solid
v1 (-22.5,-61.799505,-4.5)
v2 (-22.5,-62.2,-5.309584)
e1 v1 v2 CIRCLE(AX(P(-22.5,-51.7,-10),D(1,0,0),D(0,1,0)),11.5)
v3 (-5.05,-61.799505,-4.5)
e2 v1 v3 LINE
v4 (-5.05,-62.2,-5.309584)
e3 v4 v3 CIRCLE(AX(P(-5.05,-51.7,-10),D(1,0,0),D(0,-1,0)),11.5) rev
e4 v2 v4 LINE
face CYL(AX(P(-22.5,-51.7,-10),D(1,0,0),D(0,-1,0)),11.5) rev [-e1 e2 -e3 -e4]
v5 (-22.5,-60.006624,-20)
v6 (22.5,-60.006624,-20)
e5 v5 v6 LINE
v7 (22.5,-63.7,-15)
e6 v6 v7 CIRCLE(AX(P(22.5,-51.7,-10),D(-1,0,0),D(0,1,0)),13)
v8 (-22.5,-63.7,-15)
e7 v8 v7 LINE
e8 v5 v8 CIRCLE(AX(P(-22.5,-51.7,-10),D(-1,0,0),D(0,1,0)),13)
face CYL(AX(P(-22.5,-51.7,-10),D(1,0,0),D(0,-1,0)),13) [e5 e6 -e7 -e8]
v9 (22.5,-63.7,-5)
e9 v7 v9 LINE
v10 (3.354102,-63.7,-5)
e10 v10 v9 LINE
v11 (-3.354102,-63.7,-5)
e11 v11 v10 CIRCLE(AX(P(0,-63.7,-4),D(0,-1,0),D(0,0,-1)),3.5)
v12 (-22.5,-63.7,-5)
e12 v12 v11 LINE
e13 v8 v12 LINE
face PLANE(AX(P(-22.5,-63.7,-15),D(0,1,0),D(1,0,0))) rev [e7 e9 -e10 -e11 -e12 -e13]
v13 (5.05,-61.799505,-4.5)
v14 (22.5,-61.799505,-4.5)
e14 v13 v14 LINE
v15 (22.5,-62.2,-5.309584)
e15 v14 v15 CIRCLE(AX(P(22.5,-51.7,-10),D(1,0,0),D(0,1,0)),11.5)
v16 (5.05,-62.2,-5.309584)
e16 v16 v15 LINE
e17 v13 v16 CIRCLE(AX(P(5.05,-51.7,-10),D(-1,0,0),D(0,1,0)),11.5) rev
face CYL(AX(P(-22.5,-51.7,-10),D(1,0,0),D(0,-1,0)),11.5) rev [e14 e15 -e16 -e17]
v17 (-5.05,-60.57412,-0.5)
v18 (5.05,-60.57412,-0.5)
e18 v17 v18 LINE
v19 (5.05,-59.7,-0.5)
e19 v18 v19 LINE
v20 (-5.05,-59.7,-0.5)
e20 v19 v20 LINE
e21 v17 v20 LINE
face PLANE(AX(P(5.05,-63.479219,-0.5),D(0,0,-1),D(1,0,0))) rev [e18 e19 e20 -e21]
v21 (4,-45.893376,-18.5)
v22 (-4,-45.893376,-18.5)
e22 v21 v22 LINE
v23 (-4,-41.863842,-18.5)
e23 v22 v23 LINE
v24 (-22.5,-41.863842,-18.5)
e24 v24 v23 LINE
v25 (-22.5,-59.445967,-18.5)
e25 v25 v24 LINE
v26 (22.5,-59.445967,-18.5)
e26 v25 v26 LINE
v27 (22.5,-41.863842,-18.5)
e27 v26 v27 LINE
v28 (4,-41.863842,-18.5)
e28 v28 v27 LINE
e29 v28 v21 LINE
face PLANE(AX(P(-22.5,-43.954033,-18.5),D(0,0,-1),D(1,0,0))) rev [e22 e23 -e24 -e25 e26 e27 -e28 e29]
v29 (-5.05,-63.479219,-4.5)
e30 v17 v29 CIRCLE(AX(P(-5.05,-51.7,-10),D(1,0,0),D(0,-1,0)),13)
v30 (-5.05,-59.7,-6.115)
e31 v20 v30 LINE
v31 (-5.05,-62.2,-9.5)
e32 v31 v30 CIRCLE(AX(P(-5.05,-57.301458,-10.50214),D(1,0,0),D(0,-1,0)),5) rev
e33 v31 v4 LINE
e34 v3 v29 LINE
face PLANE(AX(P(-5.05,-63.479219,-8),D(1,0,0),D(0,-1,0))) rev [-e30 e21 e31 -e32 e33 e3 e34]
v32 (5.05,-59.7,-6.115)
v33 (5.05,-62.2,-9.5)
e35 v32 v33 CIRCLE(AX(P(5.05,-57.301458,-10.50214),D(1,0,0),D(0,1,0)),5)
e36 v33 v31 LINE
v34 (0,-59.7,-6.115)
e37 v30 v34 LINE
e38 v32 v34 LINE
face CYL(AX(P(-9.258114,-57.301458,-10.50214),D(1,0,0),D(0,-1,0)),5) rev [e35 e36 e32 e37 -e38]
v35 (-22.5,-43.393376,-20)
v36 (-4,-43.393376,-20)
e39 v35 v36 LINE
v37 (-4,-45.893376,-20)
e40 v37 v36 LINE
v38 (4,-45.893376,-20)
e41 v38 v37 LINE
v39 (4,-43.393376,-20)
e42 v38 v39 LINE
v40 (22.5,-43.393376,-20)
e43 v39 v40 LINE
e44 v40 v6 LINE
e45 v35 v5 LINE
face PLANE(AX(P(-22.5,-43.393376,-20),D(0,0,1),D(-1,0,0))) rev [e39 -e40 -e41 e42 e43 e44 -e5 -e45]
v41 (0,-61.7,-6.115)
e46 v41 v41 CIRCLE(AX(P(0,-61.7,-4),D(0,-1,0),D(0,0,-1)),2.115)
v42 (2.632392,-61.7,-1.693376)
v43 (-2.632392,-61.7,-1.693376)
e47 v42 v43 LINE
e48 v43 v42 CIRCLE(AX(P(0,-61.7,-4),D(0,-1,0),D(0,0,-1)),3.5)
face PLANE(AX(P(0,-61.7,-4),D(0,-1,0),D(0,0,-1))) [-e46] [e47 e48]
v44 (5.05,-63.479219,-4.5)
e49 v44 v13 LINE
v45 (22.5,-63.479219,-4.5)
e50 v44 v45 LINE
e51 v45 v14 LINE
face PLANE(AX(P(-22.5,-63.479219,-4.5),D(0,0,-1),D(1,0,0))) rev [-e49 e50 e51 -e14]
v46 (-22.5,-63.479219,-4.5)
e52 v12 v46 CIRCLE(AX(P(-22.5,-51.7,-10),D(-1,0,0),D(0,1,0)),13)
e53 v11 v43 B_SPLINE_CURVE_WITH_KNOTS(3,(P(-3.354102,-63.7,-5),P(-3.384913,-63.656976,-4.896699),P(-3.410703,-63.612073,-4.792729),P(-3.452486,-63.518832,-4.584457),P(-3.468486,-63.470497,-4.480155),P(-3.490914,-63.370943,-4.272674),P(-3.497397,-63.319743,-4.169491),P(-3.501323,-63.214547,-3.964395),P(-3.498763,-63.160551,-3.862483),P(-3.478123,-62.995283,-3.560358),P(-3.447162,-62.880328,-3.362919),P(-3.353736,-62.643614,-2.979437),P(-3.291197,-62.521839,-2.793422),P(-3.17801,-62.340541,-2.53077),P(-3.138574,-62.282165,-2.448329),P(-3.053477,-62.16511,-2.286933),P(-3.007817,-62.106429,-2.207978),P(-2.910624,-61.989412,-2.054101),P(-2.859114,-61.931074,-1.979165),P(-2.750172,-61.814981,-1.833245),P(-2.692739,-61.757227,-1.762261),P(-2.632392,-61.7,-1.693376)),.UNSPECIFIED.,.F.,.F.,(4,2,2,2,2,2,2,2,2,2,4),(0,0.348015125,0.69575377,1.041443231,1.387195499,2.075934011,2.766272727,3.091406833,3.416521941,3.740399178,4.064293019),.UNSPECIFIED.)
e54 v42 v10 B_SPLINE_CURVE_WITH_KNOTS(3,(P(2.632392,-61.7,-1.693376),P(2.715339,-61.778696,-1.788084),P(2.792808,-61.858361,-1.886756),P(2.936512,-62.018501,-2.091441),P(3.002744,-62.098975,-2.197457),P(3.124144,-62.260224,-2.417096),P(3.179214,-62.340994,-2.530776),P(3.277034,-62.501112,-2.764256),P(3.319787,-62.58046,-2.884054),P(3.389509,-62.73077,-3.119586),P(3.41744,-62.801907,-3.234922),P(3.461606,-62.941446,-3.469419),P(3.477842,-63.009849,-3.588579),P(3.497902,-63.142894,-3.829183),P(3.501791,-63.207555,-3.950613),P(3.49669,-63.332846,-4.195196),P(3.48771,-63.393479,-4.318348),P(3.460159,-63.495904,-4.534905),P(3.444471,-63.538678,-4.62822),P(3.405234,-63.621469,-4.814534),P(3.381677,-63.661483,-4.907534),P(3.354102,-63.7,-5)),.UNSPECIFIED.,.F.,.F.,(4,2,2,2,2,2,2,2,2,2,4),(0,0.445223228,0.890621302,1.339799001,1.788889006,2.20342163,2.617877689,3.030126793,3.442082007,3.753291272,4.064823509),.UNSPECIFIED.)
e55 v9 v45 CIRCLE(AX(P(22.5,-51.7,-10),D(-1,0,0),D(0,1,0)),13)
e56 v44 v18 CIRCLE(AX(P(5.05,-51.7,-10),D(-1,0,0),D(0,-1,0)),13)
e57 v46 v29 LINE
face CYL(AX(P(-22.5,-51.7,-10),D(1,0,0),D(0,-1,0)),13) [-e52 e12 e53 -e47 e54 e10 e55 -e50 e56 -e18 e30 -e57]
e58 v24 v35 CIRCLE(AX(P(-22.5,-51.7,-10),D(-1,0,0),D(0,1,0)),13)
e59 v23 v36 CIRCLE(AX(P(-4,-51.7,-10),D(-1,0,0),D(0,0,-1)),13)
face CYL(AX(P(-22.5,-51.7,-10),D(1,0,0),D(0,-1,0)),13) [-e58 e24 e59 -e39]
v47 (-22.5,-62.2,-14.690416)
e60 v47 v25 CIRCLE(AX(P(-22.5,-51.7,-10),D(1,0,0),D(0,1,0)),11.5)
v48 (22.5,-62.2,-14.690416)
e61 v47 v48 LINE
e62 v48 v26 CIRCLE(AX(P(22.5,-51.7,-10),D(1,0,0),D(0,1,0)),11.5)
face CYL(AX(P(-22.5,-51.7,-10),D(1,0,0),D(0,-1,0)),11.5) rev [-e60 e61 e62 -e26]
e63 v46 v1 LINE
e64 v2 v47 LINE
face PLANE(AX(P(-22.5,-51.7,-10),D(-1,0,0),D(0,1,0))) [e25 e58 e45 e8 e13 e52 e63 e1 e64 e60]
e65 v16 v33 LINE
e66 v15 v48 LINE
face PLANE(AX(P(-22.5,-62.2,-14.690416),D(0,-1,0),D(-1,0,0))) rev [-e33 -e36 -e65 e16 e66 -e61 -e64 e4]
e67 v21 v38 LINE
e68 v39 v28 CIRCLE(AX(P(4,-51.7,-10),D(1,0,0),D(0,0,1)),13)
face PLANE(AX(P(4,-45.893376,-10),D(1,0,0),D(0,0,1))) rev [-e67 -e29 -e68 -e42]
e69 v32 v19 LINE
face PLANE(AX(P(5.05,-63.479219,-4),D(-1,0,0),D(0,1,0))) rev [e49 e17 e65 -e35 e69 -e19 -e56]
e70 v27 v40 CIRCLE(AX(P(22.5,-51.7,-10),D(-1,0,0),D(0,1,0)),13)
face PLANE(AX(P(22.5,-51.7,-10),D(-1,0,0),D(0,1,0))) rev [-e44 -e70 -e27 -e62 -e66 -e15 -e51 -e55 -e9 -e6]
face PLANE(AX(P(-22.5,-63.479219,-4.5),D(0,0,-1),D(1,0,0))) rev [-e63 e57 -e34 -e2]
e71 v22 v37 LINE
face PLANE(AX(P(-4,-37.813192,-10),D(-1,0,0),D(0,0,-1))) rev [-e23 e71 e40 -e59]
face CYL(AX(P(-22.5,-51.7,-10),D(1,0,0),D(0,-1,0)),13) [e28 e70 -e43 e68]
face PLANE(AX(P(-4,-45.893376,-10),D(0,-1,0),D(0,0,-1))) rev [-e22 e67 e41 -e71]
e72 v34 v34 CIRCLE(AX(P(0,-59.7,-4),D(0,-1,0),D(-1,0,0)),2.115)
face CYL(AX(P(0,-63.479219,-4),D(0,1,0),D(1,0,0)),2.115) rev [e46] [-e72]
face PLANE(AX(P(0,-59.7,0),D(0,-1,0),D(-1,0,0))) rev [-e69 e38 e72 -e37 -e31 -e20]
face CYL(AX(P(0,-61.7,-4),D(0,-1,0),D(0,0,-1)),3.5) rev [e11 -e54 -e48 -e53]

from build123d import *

# Parameters (mm, degrees)
MODEL_R                   = 8.35
RESSALTO_EXTRUS_O2_DEPTH  = 4
ESBO_O5_W                 = 2
ESBO_O5_H                 = 24
RESSALTO_EXTRUS_O3_DEPTH  = 20
ESBO_O6_OUTSIDE_W         = 30.002
ESBO_O6_OUTSIDE_H         = 34.002
ESBO_O6_OUTSIDE_R         = 13
CORTE_EXTRUS_O1_DEPTH     = 72.292987034
CORTE_EXTRUS_O2_DEPTH     = 72.292987124
RESSALTO_EXTRUS_O4_DEPTH  = 4
CORTE_EXTRUS_O3_DEPTH     = 38.486664414
RESSALTO_EXTRUS_O5_START  = 0.5
RESSALTO_EXTRUS_O5_DEPTH  = 45
RESSALTO_EXTRUS_O6_START  = 0.5
ESBO_O14_R                = 2.115
RESSALTO_EXTRUS_O6_DEPTH  = 3.779219
CORTE_EXTRUS_O4_DEPTH     = 10.1
CORTE_EXTRUS_O7_DEPTH     = 10
ESBO_O17_R                = 3.5
CORTE_EXTRUS_O8_DEPTH     = 2
CORTE_EXTRUS_O11_REACH    = 75.217
ESBO_O19_W                = 67.006666236
ESBO_O19_H                = 28.204946311
CORTE_EXTRUS_O9_DEPTH     = 52.948283002
CORPO_MOVER_COPIAR2_ANGLE = 180


with BuildPart() as part:
    # Model → Ressalto-extrusão2 (new body)
    with BuildSketch(Plane.XY):
        Polygon((0, 44.200000002), (0, 59.200000002), (-5.55, 59.200000002), (-5.55, 63.700000002), (-23, 63.700000002), (-23, 39.700000002), (-5.55, 39.700000002), (-5.55, 44.200000002), align=None)
        with Locations((-13.5, 51.700000002)):
            Circle(MODEL_R, mode=Mode.SUBTRACT)
    extrude(amount=RESSALTO_EXTRUS_O2_DEPTH)

    # Esboço5 → Ressalto-extrusão3 (add)
    with BuildSketch(Plane(origin=(0, 0, 0), x_dir=(-1, 0, 0), z_dir=(0, 0, -1))):
        with Locations((24, 51.700000002)):
            Rectangle(ESBO_O5_W, ESBO_O5_H)
    extrude(amount=-RESSALTO_EXTRUS_O3_DEPTH)

    # Esboço6 outside → Corte-extrusão1 (cut, through all)
    with BuildSketch(Plane.ZY.offset(25)):
        with Locations((10, 51.7)):
            Rectangle(ESBO_O6_OUTSIDE_W, ESBO_O6_OUTSIDE_H)
        with Locations((10, 51.700000002)):
            Circle(ESBO_O6_OUTSIDE_R, mode=Mode.SUBTRACT)
    extrude(amount=-CORTE_EXTRUS_O1_DEPTH, mode=Mode.SUBTRACT)

    # Esboço8 → Corte-extrusão2 (cut, through all)
    with BuildSketch(Plane.ZY.offset(25)):
        Polygon((7.885, 51.700000002), (10, 49.585000002), (12.115, 51.700000002), (10, 53.815000002), align=None)
    extrude(amount=-CORTE_EXTRUS_O2_DEPTH, mode=Mode.SUBTRACT)

    # Espelhar1: part across plane


with BuildPart() as part_1:
    add(part.part)
    add(part.part.mirror(Plane(origin=(0, 44.200000002, 4), x_dir=(0, 0, 1), z_dir=(-1, 0, 0))))

    # Esboço9 → Ressalto-extrusão4 (add)
    with BuildSketch(Plane.XY.offset(4)):
        Polygon((0, 59.200000002), (4, 59.200000002), (4, 44.200000002), (-4, 44.200000002), (-4, 59.200000002), align=None)
    extrude(amount=RESSALTO_EXTRUS_O4_DEPTH)

    # Esboço10 → Corte-extrusão3 (cut, through all)
    with BuildSketch(Plane(origin=(0, 59.200000002, 0), x_dir=(1, 0, 0), z_dir=(0, 1, 0))):
        Polygon((0, -1.885), (-2.115, -4), (0, -6.115), (2.115, -4), align=None)
    extrude(amount=-CORTE_EXTRUS_O3_DEPTH, mode=Mode.SUBTRACT)


with BuildPart() as body_2:
    # Esboço13 → Ressalto-extrusão5 (new body)
    with BuildSketch(Plane.ZY.offset(-23).offset(RESSALTO_EXTRUS_O5_START)):
        with BuildLine():
            Line((18.5, 43.95403331), (18.5, 59.445966694))
            ThreePointArc((18.5, 59.445966694), (16.73742843, 61.019713418), (14.69041576, 62.200000002))
            Line((14.69041576, 62.200000002), (5.30958424, 62.200000002))
            ThreePointArc((5.30958424, 62.200000002), (4.900858659, 62.0077038), (4.5, 61.79950494))
            Line((4.5, 61.79950494), (4.5, 63.479218991))
            ThreePointArc((4.5, 63.479218991), (4.748839551, 63.592237552), (5, 63.700000002))
            Line((5, 63.700000002), (15, 63.700000002))
            ThreePointArc((15, 63.700000002), (17.724005232, 62.156564599), (20, 60.006623865))
            Line((20, 60.006623865), (20, 43.393376139))
            ThreePointArc((20, 43.393376139), (19.281560672, 42.597657914), (18.5, 41.863842216))
            Line((18.5, 41.863842216), (18.5, 43.95403331))
        make_face()
    extrude(amount=RESSALTO_EXTRUS_O5_DEPTH)

    # Esboço14 → Ressalto-extrusão6 (add)
    with BuildSketch(Plane(origin=(0, 59.200000002, 0), x_dir=(1, 0, 0), z_dir=(0, 1, 0)).offset(RESSALTO_EXTRUS_O6_START)):
        Polygon((5.05, -4), (5.05, -8), (5.05, -9.5), (-5.05, -9.5), (-5.05, -8), (-5.05, -4), (-5.05, -0.5), (5.05, -0.5), align=None)
        with Locations(Location((0, -4, 0), (0, 0, 346.325447319))):
            Circle(ESBO_O14_R, mode=Mode.SUBTRACT)
    extrude(amount=RESSALTO_EXTRUS_O6_DEPTH)

    # Esboço15 → Corte-extrusão4 (cut)
    with BuildSketch(Plane(origin=(5.05, 0, 0), x_dir=(0, 0, -1), z_dir=(1, 0, 0))):
        with BuildLine():
            Line((-5.561651151, 63.918881272), (-4.5, 63.918881272))
            Line((-4.5, 63.918881272), (-4.5, 64.979109715))
            Line((-4.5, 64.979109715), (0, 64.979109715))
            Line((0, 64.979109715), (0, 60.006623865))
            ThreePointArc((0, 60.006623865), (-2.520500092, 62.332830346), (-5.561651151, 63.918881272))
        make_face()
    extrude(amount=-CORTE_EXTRUS_O4_DEPTH, mode=Mode.SUBTRACT)

    # Esboço18 → Corte-extrusão7 (cut)
    with BuildSketch(Plane.XY.offset(20)):
        Polygon((-4, 45.893376139), (0, 45.893376139), (4, 45.893376139), (4, 37.813192245), (-4, 37.813192245), align=None)
    extrude(amount=-CORTE_EXTRUS_O7_DEPTH, mode=Mode.SUBTRACT)

    # Esboço17 → Corte-extrusão8 (cut)
    with BuildSketch(Plane(origin=(0, 63.700000002, 0), x_dir=(1, 0, 0), z_dir=(0, 1, 0))):
        with Locations((0, -4)):
            Circle(ESBO_O17_R)
    extrude(amount=-CORTE_EXTRUS_O8_DEPTH, mode=Mode.SUBTRACT)

    # Corte-extrusão11: up to this face of the body (flat: up to its plane)
    corte_extrus_o11_end = Plane(body_2.part.faces().sort_by_distance((-5.05, 61.009194207, 5.162360776))[0])
    # Esboço21 → Corte-extrusão11 (cut, up to the picked face)
    with BuildSketch(Plane(origin=(5.05, 0, 0), x_dir=(0, 0, -1), z_dir=(1, 0, 0)), mode=Mode.PRIVATE) as corte_extrus_o11_sk1:
        with BuildLine():
            Line((-6.115, 59.700000002), (-9.5, 59.700000002))
            Line((-9.5, 59.700000002), (-9.5, 62.200000002))
            ThreePointArc((-9.5, 62.200000002), (-7.531688037, 61.3234494), (-6.115, 59.700000002))
        make_face()
    corte_extrus_o11_tool1 = split(extrude(corte_extrus_o11_sk1.sketch, amount=-CORTE_EXTRUS_O11_REACH, mode=Mode.PRIVATE), bisect_by=corte_extrus_o11_end, keep=Keep.BOTH, mode=Mode.PRIVATE)
    add(corte_extrus_o11_tool1.solids().sort_by(Axis((5.05, 60.667689, 8.211637), (-1, 0, 0)))[0], mode=Mode.SUBTRACT)


with BuildPart() as part_2:
    # Corpo-Mover/Copiar1: moved
    add(part_1.part.moved(Location((0, 0, -38.699148431))))

    # Esboço19 → Corte-extrusão9 (cut, through all)
    with BuildSketch(Plane(origin=(0, 63.700000002, 0), x_dir=(1, 0, 0), z_dir=(0, 1, 0))):
        with Locations((-0.756912401, 28.10560681)):
            Rectangle(ESBO_O19_W, ESBO_O19_H)
    extrude(amount=-CORTE_EXTRUS_O9_DEPTH, mode=Mode.SUBTRACT)


with BuildPart() as body_2_1:
    # Corpo-Mover/Copiar2: moved
    add(body_2.part.rotate(Axis((0, 0, 0), (1, 0, 0)), CORPO_MOVER_COPIAR2_ANGLE))


solid = body_2_1.part
